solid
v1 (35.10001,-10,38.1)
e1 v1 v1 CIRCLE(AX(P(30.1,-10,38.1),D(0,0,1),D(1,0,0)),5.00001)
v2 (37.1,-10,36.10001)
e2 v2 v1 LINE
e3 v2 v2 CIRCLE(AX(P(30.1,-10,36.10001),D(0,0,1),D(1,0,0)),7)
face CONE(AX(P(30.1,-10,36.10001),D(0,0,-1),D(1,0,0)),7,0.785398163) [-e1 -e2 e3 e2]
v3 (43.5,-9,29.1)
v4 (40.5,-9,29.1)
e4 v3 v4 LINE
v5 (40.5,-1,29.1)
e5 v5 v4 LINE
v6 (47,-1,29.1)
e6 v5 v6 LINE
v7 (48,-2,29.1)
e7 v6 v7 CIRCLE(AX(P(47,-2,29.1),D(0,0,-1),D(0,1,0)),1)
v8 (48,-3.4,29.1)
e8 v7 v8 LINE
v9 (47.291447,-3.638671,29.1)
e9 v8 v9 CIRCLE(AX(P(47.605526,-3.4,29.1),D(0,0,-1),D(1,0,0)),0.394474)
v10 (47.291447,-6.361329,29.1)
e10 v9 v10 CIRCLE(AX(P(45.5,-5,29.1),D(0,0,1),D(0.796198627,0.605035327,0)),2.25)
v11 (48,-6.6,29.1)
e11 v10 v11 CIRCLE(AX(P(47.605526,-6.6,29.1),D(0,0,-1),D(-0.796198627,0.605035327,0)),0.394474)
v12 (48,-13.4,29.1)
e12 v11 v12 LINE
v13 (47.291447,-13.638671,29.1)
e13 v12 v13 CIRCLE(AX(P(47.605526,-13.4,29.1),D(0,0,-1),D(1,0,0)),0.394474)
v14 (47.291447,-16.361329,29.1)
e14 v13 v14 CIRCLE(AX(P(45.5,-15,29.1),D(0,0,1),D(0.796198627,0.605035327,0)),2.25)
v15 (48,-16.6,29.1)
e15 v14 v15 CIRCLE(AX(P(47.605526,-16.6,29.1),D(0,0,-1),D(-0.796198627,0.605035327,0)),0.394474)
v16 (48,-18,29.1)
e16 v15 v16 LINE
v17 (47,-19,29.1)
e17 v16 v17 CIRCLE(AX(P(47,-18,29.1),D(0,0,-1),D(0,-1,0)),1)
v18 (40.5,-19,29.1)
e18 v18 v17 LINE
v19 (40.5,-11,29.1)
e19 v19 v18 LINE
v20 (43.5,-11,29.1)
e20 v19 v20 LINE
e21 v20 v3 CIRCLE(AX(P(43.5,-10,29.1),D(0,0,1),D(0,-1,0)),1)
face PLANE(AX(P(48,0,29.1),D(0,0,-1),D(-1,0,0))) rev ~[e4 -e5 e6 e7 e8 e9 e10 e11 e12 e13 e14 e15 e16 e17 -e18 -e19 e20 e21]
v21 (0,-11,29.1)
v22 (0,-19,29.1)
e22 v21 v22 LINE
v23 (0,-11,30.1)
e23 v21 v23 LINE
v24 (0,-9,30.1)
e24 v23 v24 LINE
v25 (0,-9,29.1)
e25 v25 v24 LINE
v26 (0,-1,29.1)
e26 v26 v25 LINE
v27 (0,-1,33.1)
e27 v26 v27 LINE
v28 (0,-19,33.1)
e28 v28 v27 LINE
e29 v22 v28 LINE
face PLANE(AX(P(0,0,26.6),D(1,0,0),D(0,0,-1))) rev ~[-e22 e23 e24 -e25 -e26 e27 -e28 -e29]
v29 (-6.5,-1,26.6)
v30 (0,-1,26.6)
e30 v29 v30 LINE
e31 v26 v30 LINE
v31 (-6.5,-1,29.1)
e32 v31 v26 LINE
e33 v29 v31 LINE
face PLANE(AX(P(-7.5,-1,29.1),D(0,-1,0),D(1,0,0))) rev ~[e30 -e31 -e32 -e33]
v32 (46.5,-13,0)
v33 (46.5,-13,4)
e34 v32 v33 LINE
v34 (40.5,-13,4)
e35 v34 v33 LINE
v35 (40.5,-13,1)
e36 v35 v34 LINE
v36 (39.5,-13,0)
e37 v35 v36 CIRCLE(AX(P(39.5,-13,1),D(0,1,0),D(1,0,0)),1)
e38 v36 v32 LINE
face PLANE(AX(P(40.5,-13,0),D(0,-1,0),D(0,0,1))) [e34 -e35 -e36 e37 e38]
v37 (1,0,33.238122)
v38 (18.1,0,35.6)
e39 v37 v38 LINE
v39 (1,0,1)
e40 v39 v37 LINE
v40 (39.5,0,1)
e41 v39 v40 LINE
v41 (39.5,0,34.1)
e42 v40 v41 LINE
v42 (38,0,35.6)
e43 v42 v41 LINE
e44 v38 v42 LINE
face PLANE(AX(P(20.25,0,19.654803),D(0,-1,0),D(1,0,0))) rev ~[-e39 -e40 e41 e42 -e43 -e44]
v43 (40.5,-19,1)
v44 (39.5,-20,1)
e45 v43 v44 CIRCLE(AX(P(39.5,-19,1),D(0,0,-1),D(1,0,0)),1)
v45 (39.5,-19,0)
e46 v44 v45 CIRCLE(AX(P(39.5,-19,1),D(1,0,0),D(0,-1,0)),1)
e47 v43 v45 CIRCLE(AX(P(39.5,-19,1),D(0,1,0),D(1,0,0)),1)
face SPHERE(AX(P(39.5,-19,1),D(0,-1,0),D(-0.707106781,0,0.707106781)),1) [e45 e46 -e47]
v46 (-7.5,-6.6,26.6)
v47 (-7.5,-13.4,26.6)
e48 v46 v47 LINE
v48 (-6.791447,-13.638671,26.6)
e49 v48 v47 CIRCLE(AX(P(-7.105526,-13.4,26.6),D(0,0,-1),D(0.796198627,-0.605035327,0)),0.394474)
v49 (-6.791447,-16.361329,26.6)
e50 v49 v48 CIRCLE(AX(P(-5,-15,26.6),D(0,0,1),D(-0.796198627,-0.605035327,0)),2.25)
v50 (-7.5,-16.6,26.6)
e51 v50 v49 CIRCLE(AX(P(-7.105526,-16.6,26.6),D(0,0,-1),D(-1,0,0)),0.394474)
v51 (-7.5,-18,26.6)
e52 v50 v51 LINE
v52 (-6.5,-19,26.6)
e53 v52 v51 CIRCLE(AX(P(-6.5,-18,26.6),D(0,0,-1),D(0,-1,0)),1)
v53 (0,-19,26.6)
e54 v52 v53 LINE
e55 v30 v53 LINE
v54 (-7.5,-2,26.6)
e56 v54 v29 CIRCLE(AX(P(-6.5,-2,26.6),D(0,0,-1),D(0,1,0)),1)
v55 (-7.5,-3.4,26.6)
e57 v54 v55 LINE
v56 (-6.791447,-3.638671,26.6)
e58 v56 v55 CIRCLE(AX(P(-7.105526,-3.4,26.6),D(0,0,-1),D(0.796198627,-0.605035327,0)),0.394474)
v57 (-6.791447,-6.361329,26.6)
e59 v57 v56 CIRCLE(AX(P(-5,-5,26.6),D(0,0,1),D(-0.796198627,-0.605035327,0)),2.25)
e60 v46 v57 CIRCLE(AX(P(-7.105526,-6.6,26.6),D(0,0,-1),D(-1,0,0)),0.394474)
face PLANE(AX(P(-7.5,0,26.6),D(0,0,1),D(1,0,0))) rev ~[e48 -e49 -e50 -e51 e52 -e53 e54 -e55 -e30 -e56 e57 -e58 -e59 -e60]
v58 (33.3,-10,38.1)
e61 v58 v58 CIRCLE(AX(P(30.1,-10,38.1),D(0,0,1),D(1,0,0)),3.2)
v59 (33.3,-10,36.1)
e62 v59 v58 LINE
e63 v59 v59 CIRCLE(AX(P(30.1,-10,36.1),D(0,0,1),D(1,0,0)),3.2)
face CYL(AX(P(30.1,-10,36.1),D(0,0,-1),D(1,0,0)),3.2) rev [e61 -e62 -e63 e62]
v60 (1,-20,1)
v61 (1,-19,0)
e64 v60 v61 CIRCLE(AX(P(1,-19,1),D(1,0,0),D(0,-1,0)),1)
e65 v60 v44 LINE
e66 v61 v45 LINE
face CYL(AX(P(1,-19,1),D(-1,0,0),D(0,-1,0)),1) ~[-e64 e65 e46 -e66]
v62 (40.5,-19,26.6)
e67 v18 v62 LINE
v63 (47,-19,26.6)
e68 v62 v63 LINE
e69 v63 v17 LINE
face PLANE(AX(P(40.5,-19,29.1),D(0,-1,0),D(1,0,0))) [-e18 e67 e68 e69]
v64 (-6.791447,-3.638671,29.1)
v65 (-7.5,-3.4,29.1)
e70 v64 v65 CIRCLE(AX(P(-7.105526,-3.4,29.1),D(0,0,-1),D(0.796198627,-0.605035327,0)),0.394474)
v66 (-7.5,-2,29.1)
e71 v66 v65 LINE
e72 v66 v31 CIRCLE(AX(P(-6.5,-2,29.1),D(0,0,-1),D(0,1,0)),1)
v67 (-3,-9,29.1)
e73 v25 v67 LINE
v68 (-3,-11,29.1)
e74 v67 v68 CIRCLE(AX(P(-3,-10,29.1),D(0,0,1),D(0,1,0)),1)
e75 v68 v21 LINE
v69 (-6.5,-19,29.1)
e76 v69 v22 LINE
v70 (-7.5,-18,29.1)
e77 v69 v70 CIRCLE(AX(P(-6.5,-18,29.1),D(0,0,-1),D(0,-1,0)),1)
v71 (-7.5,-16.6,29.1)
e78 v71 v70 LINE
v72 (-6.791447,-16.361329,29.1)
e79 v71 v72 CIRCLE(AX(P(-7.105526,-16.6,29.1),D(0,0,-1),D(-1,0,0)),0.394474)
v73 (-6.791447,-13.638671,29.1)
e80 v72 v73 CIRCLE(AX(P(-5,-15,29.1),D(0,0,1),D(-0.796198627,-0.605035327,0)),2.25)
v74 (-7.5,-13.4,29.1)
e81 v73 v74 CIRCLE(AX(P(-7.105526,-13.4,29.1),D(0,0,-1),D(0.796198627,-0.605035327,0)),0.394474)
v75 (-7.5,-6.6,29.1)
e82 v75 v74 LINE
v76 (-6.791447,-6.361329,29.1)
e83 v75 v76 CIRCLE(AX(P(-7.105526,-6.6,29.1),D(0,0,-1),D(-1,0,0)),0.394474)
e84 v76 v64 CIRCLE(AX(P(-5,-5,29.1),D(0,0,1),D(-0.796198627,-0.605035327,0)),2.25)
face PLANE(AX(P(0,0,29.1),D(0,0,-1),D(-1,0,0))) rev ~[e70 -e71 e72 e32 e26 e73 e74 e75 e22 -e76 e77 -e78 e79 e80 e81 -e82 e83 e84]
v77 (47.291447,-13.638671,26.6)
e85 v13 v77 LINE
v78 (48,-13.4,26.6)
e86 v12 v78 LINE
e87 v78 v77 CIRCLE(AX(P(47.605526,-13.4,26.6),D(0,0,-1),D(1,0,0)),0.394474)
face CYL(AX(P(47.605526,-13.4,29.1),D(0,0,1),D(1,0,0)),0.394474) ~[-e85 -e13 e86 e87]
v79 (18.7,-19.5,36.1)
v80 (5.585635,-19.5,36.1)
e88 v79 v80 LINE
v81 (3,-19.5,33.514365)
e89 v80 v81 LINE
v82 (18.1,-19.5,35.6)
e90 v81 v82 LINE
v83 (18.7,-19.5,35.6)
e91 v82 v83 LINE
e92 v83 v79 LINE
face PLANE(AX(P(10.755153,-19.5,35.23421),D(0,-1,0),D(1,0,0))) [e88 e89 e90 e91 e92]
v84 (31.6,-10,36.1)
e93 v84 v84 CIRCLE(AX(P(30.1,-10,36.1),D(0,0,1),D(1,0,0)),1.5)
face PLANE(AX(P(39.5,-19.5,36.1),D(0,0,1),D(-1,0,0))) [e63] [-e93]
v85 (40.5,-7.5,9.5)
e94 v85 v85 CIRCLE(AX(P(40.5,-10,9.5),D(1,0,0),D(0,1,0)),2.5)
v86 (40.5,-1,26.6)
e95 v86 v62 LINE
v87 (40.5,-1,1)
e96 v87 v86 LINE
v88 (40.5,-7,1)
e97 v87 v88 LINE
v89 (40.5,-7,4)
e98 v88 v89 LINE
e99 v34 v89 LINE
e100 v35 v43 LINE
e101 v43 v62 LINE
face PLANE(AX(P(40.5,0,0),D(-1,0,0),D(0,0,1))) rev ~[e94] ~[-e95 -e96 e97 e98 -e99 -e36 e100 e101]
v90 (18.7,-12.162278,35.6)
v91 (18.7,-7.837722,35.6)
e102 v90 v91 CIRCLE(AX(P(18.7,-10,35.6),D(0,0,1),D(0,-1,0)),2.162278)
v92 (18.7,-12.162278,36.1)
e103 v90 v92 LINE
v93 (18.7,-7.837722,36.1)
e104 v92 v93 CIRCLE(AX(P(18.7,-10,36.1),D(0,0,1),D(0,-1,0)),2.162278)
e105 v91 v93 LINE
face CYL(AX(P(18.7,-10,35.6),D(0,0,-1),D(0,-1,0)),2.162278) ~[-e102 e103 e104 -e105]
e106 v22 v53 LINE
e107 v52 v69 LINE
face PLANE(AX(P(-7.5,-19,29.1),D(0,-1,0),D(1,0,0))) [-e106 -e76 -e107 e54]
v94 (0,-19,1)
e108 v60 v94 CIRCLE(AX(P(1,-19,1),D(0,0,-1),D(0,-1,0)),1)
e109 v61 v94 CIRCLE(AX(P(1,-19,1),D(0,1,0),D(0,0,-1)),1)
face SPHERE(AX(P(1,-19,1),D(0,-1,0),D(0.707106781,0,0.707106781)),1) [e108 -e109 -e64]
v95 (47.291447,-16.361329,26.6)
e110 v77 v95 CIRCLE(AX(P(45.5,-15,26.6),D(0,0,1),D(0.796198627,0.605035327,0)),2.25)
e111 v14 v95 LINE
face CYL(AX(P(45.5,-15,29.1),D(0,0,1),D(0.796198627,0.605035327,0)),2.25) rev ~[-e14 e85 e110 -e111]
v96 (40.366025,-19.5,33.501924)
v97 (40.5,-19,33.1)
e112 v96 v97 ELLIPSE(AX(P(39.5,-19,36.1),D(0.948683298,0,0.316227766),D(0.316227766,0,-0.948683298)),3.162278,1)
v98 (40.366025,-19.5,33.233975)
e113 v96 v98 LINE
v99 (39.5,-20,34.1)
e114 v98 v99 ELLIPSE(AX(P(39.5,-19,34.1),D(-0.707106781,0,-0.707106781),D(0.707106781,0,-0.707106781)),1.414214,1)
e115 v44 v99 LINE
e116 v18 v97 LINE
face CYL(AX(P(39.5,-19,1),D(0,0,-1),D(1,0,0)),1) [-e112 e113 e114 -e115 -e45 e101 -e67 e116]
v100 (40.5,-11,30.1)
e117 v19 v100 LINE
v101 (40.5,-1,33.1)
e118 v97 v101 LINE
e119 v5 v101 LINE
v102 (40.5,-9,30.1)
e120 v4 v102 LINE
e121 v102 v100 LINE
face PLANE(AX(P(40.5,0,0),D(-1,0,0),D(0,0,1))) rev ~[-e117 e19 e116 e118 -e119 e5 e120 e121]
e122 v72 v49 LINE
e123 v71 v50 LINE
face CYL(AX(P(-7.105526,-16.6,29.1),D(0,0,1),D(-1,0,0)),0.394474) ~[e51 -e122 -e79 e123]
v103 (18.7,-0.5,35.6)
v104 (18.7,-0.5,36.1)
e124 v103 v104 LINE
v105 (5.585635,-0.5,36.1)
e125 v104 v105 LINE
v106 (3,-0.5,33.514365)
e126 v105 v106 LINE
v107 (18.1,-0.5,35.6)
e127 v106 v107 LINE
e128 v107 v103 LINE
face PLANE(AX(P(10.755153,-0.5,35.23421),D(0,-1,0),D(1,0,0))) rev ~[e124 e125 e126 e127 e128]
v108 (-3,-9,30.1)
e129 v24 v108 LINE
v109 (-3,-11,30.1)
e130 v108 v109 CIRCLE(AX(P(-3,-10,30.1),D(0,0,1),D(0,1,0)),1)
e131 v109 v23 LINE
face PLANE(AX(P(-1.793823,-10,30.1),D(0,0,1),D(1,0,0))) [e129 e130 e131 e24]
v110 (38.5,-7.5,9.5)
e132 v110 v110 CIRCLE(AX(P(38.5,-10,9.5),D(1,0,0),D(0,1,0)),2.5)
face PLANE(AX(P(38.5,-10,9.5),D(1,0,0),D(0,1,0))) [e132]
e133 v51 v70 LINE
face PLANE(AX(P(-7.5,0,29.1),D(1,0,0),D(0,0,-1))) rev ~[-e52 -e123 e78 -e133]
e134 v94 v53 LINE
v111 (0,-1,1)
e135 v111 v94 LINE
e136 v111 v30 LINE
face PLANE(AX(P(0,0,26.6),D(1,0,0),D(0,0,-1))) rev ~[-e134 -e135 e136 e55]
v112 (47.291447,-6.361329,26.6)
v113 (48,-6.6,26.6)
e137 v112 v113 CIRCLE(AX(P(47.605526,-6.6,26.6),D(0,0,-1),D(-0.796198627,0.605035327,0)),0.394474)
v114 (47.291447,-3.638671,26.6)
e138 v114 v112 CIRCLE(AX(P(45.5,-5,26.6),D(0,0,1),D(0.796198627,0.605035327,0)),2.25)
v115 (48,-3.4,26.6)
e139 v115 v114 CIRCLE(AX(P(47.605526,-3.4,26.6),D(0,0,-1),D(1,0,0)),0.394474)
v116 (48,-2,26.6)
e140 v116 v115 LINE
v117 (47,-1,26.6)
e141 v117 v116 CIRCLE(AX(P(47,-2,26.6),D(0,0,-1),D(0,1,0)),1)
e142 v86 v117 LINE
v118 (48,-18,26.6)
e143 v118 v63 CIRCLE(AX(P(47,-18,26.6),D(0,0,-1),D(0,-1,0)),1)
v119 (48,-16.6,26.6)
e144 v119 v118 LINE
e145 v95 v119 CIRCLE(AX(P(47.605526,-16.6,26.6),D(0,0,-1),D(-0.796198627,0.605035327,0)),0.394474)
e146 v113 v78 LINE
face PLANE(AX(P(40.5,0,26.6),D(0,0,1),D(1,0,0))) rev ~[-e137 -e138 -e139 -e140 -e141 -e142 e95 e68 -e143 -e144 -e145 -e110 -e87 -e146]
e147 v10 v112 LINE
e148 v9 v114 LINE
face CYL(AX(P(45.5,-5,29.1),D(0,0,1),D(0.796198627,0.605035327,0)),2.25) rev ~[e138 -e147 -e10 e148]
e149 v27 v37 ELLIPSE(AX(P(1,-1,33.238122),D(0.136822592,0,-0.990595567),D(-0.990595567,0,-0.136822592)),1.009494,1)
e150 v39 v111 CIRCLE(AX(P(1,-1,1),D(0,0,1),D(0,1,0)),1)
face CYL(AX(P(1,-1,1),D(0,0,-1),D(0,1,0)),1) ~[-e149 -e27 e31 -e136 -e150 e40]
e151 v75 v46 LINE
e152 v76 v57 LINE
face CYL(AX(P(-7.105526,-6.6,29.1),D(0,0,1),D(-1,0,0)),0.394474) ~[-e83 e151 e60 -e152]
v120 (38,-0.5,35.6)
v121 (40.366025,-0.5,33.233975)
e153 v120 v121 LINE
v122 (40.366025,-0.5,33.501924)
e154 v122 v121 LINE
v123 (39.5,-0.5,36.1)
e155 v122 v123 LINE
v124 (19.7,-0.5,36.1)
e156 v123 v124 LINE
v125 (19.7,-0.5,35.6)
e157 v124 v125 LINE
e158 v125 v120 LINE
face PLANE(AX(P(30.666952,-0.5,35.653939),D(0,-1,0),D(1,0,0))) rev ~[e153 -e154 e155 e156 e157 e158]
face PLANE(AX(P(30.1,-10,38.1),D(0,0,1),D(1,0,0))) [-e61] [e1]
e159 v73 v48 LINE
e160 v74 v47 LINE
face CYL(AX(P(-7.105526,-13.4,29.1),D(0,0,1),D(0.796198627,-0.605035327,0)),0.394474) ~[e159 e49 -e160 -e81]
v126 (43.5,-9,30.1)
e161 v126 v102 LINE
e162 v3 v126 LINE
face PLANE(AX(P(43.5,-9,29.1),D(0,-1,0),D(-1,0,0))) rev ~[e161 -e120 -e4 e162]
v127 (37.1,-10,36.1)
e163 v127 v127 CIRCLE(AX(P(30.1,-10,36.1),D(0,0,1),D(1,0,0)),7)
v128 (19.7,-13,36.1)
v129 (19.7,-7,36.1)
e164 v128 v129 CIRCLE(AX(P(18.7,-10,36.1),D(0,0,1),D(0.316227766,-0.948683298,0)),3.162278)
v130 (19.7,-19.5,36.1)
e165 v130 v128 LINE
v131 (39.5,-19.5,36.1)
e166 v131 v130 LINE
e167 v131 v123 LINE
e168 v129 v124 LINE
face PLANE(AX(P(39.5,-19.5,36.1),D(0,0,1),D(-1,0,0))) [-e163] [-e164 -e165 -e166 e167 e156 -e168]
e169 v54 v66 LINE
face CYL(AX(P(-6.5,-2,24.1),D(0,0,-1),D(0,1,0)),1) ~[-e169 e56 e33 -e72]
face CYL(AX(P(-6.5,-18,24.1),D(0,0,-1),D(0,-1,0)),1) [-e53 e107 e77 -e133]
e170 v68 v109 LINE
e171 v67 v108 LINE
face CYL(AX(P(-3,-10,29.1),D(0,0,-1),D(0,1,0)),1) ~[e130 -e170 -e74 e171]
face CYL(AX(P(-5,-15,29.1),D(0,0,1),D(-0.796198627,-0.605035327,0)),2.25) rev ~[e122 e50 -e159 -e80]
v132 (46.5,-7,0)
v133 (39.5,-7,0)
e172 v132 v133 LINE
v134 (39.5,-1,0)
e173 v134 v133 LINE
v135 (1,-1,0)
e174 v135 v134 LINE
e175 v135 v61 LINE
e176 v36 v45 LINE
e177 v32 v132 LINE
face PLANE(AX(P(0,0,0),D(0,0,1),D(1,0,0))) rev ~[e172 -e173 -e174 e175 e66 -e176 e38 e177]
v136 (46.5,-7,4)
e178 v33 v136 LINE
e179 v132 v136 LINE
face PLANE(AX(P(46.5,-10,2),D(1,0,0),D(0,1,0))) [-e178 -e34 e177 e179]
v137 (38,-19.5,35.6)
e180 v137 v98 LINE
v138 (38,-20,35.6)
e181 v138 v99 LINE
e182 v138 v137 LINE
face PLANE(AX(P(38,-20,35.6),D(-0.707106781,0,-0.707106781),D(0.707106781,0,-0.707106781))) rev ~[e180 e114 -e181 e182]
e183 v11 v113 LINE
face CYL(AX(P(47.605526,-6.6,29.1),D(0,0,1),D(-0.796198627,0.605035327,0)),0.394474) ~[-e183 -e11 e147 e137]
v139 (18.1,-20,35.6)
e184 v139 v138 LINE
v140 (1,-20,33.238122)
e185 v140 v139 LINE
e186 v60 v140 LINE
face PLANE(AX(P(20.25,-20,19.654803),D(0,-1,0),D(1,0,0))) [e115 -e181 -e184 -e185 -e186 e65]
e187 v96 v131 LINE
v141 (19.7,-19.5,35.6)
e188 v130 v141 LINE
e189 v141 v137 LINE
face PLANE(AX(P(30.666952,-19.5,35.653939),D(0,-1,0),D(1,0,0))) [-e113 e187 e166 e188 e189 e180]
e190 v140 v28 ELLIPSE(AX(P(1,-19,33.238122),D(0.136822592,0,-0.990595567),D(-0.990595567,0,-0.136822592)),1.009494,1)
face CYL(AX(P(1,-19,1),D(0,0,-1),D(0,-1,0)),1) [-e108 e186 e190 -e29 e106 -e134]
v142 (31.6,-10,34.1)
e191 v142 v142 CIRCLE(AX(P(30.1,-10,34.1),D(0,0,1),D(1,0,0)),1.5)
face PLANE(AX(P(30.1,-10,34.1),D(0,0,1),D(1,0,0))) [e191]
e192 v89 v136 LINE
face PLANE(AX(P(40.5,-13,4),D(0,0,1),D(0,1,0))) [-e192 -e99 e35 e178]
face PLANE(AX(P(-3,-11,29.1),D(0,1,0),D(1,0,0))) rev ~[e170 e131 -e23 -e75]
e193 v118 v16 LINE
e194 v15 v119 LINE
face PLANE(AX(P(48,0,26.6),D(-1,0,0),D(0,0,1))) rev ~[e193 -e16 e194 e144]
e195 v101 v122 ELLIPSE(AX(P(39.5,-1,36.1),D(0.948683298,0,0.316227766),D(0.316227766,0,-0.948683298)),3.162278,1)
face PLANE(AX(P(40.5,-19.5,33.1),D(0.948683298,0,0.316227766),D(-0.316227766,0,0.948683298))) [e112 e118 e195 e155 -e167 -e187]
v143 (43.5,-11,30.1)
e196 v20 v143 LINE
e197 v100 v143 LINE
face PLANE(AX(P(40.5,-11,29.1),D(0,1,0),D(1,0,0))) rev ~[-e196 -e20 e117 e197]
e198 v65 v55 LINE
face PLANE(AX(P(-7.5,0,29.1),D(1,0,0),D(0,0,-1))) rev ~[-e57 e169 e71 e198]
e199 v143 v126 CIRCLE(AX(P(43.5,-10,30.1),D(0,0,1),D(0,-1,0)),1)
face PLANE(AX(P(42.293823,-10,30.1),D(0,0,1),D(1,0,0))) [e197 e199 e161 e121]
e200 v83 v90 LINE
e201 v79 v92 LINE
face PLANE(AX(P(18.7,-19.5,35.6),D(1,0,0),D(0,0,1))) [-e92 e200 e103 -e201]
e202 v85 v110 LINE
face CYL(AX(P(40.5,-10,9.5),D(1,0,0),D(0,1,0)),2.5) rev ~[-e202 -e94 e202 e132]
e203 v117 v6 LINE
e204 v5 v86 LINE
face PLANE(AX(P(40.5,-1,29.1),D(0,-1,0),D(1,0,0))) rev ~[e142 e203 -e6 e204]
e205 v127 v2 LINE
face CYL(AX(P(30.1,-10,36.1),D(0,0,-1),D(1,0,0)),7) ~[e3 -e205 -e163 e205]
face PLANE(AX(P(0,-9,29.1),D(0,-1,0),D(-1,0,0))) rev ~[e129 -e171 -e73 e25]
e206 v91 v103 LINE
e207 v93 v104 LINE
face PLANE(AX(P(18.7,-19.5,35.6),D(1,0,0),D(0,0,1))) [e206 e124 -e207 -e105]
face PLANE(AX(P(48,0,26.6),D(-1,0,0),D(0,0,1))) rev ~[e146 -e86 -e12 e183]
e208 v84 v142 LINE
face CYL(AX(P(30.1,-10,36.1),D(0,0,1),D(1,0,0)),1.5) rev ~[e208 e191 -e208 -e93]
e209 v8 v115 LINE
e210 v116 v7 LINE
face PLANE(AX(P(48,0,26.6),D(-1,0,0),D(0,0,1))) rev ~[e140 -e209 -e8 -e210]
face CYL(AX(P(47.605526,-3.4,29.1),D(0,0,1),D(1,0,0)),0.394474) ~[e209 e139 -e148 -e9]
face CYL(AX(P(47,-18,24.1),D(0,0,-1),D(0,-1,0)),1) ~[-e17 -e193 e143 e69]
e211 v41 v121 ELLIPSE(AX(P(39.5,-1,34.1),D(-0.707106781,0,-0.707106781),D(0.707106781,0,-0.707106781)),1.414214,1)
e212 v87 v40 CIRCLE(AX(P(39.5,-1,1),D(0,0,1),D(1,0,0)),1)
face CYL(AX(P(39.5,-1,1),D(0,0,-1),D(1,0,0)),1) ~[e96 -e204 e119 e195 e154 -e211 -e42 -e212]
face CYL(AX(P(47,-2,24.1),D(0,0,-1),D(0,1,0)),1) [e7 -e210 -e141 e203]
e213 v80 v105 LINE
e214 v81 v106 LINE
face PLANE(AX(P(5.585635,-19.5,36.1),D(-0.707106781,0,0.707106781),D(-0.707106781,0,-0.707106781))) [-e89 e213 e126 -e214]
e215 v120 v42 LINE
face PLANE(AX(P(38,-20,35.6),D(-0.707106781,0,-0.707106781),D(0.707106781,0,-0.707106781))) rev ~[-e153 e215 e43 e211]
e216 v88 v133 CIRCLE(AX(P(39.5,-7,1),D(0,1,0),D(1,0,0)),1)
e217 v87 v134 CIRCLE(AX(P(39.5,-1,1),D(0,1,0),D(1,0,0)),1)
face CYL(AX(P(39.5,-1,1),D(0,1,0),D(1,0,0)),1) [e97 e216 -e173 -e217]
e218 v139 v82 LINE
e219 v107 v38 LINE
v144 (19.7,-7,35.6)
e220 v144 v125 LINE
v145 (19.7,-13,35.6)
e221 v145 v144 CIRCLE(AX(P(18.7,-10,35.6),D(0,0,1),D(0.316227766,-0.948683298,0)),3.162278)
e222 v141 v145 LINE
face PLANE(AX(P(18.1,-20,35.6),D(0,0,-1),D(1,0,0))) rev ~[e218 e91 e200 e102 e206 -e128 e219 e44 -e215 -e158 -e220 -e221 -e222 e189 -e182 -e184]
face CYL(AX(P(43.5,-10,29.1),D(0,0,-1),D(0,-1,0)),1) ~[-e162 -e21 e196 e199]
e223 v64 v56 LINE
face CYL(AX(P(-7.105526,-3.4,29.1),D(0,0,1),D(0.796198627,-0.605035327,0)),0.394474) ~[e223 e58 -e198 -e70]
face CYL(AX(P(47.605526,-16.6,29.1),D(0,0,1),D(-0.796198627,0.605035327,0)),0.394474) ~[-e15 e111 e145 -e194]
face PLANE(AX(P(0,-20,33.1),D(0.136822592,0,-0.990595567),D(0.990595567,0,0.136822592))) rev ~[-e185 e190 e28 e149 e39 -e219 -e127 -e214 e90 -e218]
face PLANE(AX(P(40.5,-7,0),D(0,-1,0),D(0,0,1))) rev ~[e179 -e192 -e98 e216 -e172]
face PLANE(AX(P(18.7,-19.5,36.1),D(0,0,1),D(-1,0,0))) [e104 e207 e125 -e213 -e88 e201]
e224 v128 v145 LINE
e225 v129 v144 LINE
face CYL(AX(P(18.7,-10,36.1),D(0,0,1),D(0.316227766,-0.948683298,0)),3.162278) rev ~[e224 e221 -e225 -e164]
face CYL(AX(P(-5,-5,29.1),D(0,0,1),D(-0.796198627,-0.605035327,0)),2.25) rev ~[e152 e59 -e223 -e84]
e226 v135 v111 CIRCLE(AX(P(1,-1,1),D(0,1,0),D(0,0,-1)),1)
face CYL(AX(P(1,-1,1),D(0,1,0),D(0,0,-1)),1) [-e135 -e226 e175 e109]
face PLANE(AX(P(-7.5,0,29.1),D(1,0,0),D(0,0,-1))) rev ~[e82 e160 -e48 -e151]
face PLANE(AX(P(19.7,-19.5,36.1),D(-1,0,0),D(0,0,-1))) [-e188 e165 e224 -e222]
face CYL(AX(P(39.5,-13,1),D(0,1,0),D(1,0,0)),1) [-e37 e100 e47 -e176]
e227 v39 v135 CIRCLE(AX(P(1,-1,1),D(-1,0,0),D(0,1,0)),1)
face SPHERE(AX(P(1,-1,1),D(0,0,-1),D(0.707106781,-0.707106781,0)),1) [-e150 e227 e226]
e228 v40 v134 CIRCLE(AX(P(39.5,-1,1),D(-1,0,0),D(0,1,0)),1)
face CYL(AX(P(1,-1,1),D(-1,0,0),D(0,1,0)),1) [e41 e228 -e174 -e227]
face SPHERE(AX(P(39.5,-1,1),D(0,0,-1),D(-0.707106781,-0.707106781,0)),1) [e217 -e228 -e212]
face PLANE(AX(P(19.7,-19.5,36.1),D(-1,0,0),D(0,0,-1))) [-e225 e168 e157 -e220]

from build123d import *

# Parameters (mm, degrees)
F1_DEPTH      = 20
F2_W          = 7.5
F2_H          = 1
F3_DEPTH      = 2.5
F5_DEPTH      = 1
F7_DEPTH      = 20
F10_DEPTH     = 19
F12_DEPTH     = 0.5
F14_DEPTH     = 0.5
F15_R         = 7
F15_R_2       = 3.2
F16_DEPTH     = 2
F17_SIZE      = 1.99999
F18_R         = 1.5
F19_DEPTH     = 2
F20_R         = 2.5
F21_DEPTH     = 2
F22_W         = 6
F22_H         = 4
F23_DEPTH     = 6
F24_T1_DEPTH  = 34.6
F24_T3_DEPTH  = 7.5
F24_T5_DEPTH  = 38.5
F24_T7_DEPTH  = 18
F24_T9_DEPTH  = 6
F24_T11_DEPTH = 6
F24_S15_W     = 1
F24_S15_H     = 1
F24_T16_DEPTH = 1
F24_S21_W     = 1
F24_S21_H     = 1
F24_T22_DEPTH = 1
F24_S27_W     = 1
F24_S27_H     = 1
F24_T28_DEPTH = 1
F24_S33_W     = 1
F24_S33_H     = 1
F24_T34_DEPTH = 1


# Not quite as in the source:
# - a fillet or chamfer that OpenCascade refuses, or shapes differently, is made with other operations: its cross-section is extruded or revolved along the edge and cut away or added
# - a fillet or chamfer is up to 0.001 mm smaller than in the source, because OpenCascade refuses the exact size


with BuildPart() as f1:
    # F0 (on Front) → F1 (new body)
    with BuildSketch(Plane.XZ):
        Polygon((0, 26.6), (0, 0), (40.5, 0), (40.5, 26.6), (48, 26.6), (48, 29.1), (40.5, 29.1), (40.5, 36.1), (0, 36.1), (0, 29.1), (-7.5, 29.1), (-7.5, 26.6), align=None)
    extrude(amount=F1_DEPTH)

    # F2 (on face) → F3 (cut, through all)
    with BuildSketch(Plane.XY.offset(29.1)):
        with Locations((-3.75, -0.5)):
            Rectangle(F2_W, F2_H)
        with Locations((-3.75, -19.5)):
            Rectangle(F2_W, F2_H)
        with BuildLine():
            ThreePointArc((-7.5, -6.6), (-7.2314497593, -6.2261647771), (-6.7914469101, -6.3613294855))
            ThreePointArc((-6.7914469101, -6.3613294855), (-2.75, -5), (-6.7914469101, -3.6386705145))
            ThreePointArc((-6.7914469101, -3.6386705145), (-7.2314497593, -3.7738352229), (-7.5, -3.4))
            Line((-7.5, -3.4), (-7.5, -6.6))
        make_face()
        with BuildLine():
            ThreePointArc((-7.5, -16.6), (-7.2314497593, -16.2261647771), (-6.7914469101, -16.3613294855))
            ThreePointArc((-6.7914469101, -16.3613294855), (-2.75, -15), (-6.7914469101, -13.6386705145))
            ThreePointArc((-6.7914469101, -13.6386705145), (-7.2314497593, -13.7738352229), (-7.5, -13.4))
            Line((-7.5, -13.4), (-7.5, -16.6))
        make_face()
        with BuildLine():
            Line((48, -16.6), (48, -13.4))
            ThreePointArc((48, -13.4), (47.7314497593, -13.7738352229), (47.2914469101, -13.6386705145))
            ThreePointArc((47.2914469101, -13.6386705145), (43.25, -15), (47.2914469101, -16.3613294855))
            ThreePointArc((47.2914469101, -16.3613294855), (47.7314497593, -16.2261647771), (48, -16.6))
        make_face()
        with Locations((44.25, -0.5)):
            Rectangle(F2_W, F2_H)
        with BuildLine():
            ThreePointArc((47.2914469101, -3.6386705145), (43.25, -5), (47.2914469101, -6.3613294855))
            ThreePointArc((47.2914469101, -6.3613294855), (47.7314497593, -6.2261647771), (48, -6.6))
            Line((48, -6.6), (48, -3.4))
            ThreePointArc((48, -3.4), (47.7314497593, -3.7738352229), (47.2914469101, -3.6386705145))
        make_face()
        with Locations((44.25, -19.5)):
            Rectangle(F2_W, F2_H)
    extrude(amount=-F3_DEPTH, mode=Mode.SUBTRACT)

    # F4 (on face) → F5 (join)
    with BuildSketch(Plane.XY.offset(29.1)):
        with BuildLine():
            Line((0, -11), (0, -9))
            Line((0, -9), (-3, -9))
            ThreePointArc((-3, -9), (-4, -10), (-3, -11))
            Line((-3, -11), (0, -11))
        make_face()
        with BuildLine():
            Line((43.5, -9), (40.5, -9))
            Line((40.5, -9), (40.5, -11))
            Line((40.5, -11), (43.5, -11))
            ThreePointArc((43.5, -11), (44.5, -10), (43.5, -9))
        make_face()
    extrude(amount=F5_DEPTH)

    # F6 (on face) → F7 (cut, through all)
    with BuildSketch(Plane.XZ.offset(20)):
        Polygon((40.5, 36.1), (0, 36.1), (0, 33.1), (18.1, 35.6), (38, 35.6), (40.5, 33.1), align=None)
    extrude(amount=-F7_DEPTH, mode=Mode.SUBTRACT)

    # F9 (on offset) → F10 (join)
    with BuildSketch(Plane.XZ.offset(19.5)):
        Polygon((5.5856353591, 36.1), (3, 33.5143646409), (18.1, 35.6), (18.7, 35.6), (18.7, 36.1), align=None)
        Polygon((39.5, 36.1), (19.7, 36.1), (19.7, 35.6), (38, 35.6), (40.5, 33.1), align=None)
    extrude(amount=-F10_DEPTH)

    # F11 (on face) → F12 (cut, through all)
    with BuildSketch(Plane.XY.offset(36.1)):
        with BuildLine():
            Line((19.7, -7), (19.7, -13))
            ThreePointArc((19.7, -13), (21.8622776602, -10), (19.7, -7))
        make_face()
    extrude(amount=-F12_DEPTH, mode=Mode.SUBTRACT)

    # F13 (on face) → F14 (join)
    with BuildSketch(Plane.XY.offset(35.6)):
        with BuildLine():
            Line((18.7, -7.8377223398), (18.7, -12.1622776602))
            ThreePointArc((18.7, -12.1622776602), (20.8622776602, -10), (18.7, -7.8377223398))
        make_face()
    extrude(amount=F14_DEPTH)

    # F15 (on face) → F16 (join)
    with BuildSketch(Plane.XY.offset(36.1)):
        with Locations((30.1, -10)):
            Circle(F15_R)
        with Locations((30.1, -10)):
            Circle(F15_R_2, mode=Mode.SUBTRACT)
    extrude(amount=F16_DEPTH)

    # F17 (size 2 in the source; OpenCascade refuses exactly that, so slightly less here)
    f17_edges = [f1.edges().sort_by_distance(p)[0] for p in [
        (23.1, -10, 38.1),
    ]]
    chamfer(f17_edges, length=F17_SIZE)

    # F18 (on face) → F19 (cut)
    with BuildSketch(Plane.XY.offset(36.1)):
        with Locations((30.1, -10)):
            Circle(F18_R)
    extrude(amount=-F19_DEPTH, mode=Mode.SUBTRACT)

    # F20 (on face) → F21 (cut)
    with BuildSketch(Plane.YZ.offset(40.5)):
        with Locations((-10, 9.5)):
            Circle(F20_R)
    extrude(amount=-F21_DEPTH, mode=Mode.SUBTRACT)

    # F22 (on face) → F23 (join)
    with BuildSketch(Plane.YZ.offset(40.5)):
        with Locations((-10, 2)):
            Rectangle(F22_W, F22_H)
    extrude(amount=F23_DEPTH)

    # F24: fillet of radius 1 on 13 edges, made by hand

    # F24_s2 → F24_t1 (cut)
    with BuildSketch(Plane.XY.offset(1)):
        with BuildLine():
            ThreePointArc((1, 0), (0.2928932188, -0.2928932188), (0, -1))
            Line((0, -1), (0, 0))
            Line((0, 0), (1, 0))
        make_face()
        with BuildLine():
            ThreePointArc((1, -20), (0.2928932188, -19.7071067812), (0, -19))
            Line((0, -19), (0, -20))
            Line((0, -20), (1, -20))
        make_face()
        with BuildLine():
            ThreePointArc((40.5, -19), (40.2071067812, -19.7071067812), (39.5, -20))
            Line((39.5, -20), (40.5, -20))
            Line((40.5, -20), (40.5, -19))
        make_face()
        with BuildLine():
            ThreePointArc((40.5, -1), (40.2071067812, -0.2928932188), (39.5, 0))
            Line((39.5, 0), (40.5, 0))
            Line((40.5, 0), (40.5, -1))
        make_face()
    extrude(amount=F24_T1_DEPTH, mode=Mode.SUBTRACT)

    # F24_s4 → F24_t3 (cut)
    with BuildSketch(Plane.XY.offset(24.1)):
        with BuildLine():
            ThreePointArc((-6.5, -19), (-7.2071067812, -18.7071067812), (-7.5, -18))
            Line((-7.5, -18), (-7.5, -19))
            Line((-7.5, -19), (-6.5, -19))
        make_face()
        with BuildLine():
            ThreePointArc((-6.5, -1), (-7.2071067812, -1.2928932188), (-7.5, -2))
            Line((-7.5, -2), (-7.5, -1))
            Line((-7.5, -1), (-6.5, -1))
        make_face()
        with BuildLine():
            ThreePointArc((47, -1), (47.7071067812, -1.2928932188), (48, -2))
            Line((48, -2), (48, -1))
            Line((48, -1), (47, -1))
        make_face()
        with BuildLine():
            ThreePointArc((47, -19), (47.7071067812, -18.7071067812), (48, -18))
            Line((48, -18), (48, -19))
            Line((48, -19), (47, -19))
        make_face()
    extrude(amount=F24_T3_DEPTH, mode=Mode.SUBTRACT)

    # F24_s6 → F24_t5 (cut)
    with BuildSketch(Plane.YZ.offset(1)):
        with BuildLine():
            ThreePointArc((-20, 1), (-19.7071067812, 0.2928932188), (-19, 0))
            Line((-19, 0), (-20, 0))
            Line((-20, 0), (-20, 1))
        make_face()
        with BuildLine():
            ThreePointArc((0, 1), (-0.2928932188, 0.2928932188), (-1, 0))
            Line((-1, 0), (0, 0))
            Line((0, 0), (0, 1))
        make_face()
    extrude(amount=F24_T5_DEPTH, mode=Mode.SUBTRACT)

    # F24_s8 → F24_t7 (cut)
    with BuildSketch(Plane.XZ.offset(1)):
        with BuildLine():
            ThreePointArc((1, 0), (0.2928932188, 0.2928932188), (0, 1))
            Line((0, 1), (0, 0))
            Line((0, 0), (1, 0))
        make_face()
    extrude(amount=F24_T7_DEPTH, mode=Mode.SUBTRACT)

    # F24_s10 → F24_t9 (cut)
    with BuildSketch(Plane.XZ.offset(13)):
        with BuildLine():
            ThreePointArc((40.5, 1), (40.2071067812, 0.2928932188), (39.5, 0))
            Line((39.5, 0), (40.5, 0))
            Line((40.5, 0), (40.5, 1))
        make_face()
    extrude(amount=F24_T9_DEPTH, mode=Mode.SUBTRACT)

    # F24_s12 → F24_t11 (cut)
    with BuildSketch(Plane.XZ.offset(1)):
        with BuildLine():
            ThreePointArc((40.5, 1), (40.2071067812, 0.2928932188), (39.5, 0))
            Line((39.5, 0), (40.5, 0))
            Line((40.5, 0), (40.5, 1))
        make_face()
    extrude(amount=F24_T11_DEPTH, mode=Mode.SUBTRACT)


with BuildPart() as f24_tool14:
    # F24_s15 → F24_t16 (new body)
    with BuildSketch(Plane.XY.offset(1)):
        with Locations((0.5, -0.5)):
            Rectangle(F24_S15_W, F24_S15_H)
    extrude(amount=-F24_T16_DEPTH)

    # F24_s17 → F24_t18 (revolve, cut)
    with BuildSketch(Plane(origin=(1, -1, 1), x_dir=(0.7071067812, -0.7071067812, 0), z_dir=(0.7071067812, 0.7071067812, 0))):
        with BuildLine():
            ThreePointArc((0, -1), (1, 0), (0, 1))
            Line((0, 1), (0, -1))
        make_face()
    revolve(axis=Axis((1, -1, 1), (0, 0, -1)), mode=Mode.SUBTRACT)


with BuildPart() as f1_1:
    add(f1.part)

    # F24_t13: cut F24_tool14
    add(f24_tool14.part, mode=Mode.SUBTRACT)


with BuildPart() as f24_tool20:
    # F24_s21 → F24_t22 (new body)
    with BuildSketch(Plane.XZ.offset(19)):
        with Locations((0.5, 0.5)):
            Rectangle(F24_S21_W, F24_S21_H)
    extrude(amount=F24_T22_DEPTH)

    # F24_s23 → F24_t24 (revolve, cut)
    with BuildSketch(Plane(origin=(1, -19, 1), x_dir=(0.7071067812, 0, 0.7071067812), z_dir=(0.7071067812, 0, -0.7071067812))):
        with BuildLine():
            ThreePointArc((0, -1), (1, 0), (0, 1))
            Line((0, 1), (0, -1))
        make_face()
    revolve(axis=Axis((1, -19, 1), (0, -1, 0)), mode=Mode.SUBTRACT)


with BuildPart() as f1_2:
    add(f1_1.part)

    # F24_t19: cut F24_tool20
    add(f24_tool20.part, mode=Mode.SUBTRACT)


with BuildPart() as f24_tool26:
    # F24_s27 → F24_t28 (new body)
    with BuildSketch(Plane.XZ.offset(19)):
        with Locations((40, 0.5)):
            Rectangle(F24_S27_W, F24_S27_H)
    extrude(amount=F24_T28_DEPTH)

    # F24_s29 → F24_t30 (revolve, cut)
    with BuildSketch(Plane(origin=(39.5, -19, 1), x_dir=(-0.7071067812, 0, 0.7071067812), z_dir=(0.7071067812, 0, 0.7071067812))):
        with BuildLine():
            ThreePointArc((0, -1), (1, 0), (0, 1))
            Line((0, 1), (0, -1))
        make_face()
    revolve(axis=Axis((39.5, -19, 1), (0, -1, 0)), mode=Mode.SUBTRACT)


with BuildPart() as f1_3:
    add(f1_2.part)

    # F24_t25: cut F24_tool26
    add(f24_tool26.part, mode=Mode.SUBTRACT)


with BuildPart() as f24_tool32:
    # F24_s33 → F24_t34 (new body)
    with BuildSketch(Plane.XY.offset(1)):
        with Locations((40, -0.5)):
            Rectangle(F24_S33_W, F24_S33_H)
    extrude(amount=-F24_T34_DEPTH)

    # F24_s35 → F24_t36 (revolve, cut)
    with BuildSketch(Plane(origin=(39.5, -1, 1), x_dir=(-0.7071067812, -0.7071067812, 0), z_dir=(0.7071067812, -0.7071067812, 0))):
        with BuildLine():
            ThreePointArc((0, -1), (1, 0), (0, 1))
            Line((0, 1), (0, -1))
        make_face()
    revolve(axis=Axis((39.5, -1, 1), (0, 0, -1)), mode=Mode.SUBTRACT)


with BuildPart() as f1_4:
    add(f1_3.part)

    # F24_t31: cut F24_tool32
    add(f24_tool32.part, mode=Mode.SUBTRACT)


solid = f1_4.part
